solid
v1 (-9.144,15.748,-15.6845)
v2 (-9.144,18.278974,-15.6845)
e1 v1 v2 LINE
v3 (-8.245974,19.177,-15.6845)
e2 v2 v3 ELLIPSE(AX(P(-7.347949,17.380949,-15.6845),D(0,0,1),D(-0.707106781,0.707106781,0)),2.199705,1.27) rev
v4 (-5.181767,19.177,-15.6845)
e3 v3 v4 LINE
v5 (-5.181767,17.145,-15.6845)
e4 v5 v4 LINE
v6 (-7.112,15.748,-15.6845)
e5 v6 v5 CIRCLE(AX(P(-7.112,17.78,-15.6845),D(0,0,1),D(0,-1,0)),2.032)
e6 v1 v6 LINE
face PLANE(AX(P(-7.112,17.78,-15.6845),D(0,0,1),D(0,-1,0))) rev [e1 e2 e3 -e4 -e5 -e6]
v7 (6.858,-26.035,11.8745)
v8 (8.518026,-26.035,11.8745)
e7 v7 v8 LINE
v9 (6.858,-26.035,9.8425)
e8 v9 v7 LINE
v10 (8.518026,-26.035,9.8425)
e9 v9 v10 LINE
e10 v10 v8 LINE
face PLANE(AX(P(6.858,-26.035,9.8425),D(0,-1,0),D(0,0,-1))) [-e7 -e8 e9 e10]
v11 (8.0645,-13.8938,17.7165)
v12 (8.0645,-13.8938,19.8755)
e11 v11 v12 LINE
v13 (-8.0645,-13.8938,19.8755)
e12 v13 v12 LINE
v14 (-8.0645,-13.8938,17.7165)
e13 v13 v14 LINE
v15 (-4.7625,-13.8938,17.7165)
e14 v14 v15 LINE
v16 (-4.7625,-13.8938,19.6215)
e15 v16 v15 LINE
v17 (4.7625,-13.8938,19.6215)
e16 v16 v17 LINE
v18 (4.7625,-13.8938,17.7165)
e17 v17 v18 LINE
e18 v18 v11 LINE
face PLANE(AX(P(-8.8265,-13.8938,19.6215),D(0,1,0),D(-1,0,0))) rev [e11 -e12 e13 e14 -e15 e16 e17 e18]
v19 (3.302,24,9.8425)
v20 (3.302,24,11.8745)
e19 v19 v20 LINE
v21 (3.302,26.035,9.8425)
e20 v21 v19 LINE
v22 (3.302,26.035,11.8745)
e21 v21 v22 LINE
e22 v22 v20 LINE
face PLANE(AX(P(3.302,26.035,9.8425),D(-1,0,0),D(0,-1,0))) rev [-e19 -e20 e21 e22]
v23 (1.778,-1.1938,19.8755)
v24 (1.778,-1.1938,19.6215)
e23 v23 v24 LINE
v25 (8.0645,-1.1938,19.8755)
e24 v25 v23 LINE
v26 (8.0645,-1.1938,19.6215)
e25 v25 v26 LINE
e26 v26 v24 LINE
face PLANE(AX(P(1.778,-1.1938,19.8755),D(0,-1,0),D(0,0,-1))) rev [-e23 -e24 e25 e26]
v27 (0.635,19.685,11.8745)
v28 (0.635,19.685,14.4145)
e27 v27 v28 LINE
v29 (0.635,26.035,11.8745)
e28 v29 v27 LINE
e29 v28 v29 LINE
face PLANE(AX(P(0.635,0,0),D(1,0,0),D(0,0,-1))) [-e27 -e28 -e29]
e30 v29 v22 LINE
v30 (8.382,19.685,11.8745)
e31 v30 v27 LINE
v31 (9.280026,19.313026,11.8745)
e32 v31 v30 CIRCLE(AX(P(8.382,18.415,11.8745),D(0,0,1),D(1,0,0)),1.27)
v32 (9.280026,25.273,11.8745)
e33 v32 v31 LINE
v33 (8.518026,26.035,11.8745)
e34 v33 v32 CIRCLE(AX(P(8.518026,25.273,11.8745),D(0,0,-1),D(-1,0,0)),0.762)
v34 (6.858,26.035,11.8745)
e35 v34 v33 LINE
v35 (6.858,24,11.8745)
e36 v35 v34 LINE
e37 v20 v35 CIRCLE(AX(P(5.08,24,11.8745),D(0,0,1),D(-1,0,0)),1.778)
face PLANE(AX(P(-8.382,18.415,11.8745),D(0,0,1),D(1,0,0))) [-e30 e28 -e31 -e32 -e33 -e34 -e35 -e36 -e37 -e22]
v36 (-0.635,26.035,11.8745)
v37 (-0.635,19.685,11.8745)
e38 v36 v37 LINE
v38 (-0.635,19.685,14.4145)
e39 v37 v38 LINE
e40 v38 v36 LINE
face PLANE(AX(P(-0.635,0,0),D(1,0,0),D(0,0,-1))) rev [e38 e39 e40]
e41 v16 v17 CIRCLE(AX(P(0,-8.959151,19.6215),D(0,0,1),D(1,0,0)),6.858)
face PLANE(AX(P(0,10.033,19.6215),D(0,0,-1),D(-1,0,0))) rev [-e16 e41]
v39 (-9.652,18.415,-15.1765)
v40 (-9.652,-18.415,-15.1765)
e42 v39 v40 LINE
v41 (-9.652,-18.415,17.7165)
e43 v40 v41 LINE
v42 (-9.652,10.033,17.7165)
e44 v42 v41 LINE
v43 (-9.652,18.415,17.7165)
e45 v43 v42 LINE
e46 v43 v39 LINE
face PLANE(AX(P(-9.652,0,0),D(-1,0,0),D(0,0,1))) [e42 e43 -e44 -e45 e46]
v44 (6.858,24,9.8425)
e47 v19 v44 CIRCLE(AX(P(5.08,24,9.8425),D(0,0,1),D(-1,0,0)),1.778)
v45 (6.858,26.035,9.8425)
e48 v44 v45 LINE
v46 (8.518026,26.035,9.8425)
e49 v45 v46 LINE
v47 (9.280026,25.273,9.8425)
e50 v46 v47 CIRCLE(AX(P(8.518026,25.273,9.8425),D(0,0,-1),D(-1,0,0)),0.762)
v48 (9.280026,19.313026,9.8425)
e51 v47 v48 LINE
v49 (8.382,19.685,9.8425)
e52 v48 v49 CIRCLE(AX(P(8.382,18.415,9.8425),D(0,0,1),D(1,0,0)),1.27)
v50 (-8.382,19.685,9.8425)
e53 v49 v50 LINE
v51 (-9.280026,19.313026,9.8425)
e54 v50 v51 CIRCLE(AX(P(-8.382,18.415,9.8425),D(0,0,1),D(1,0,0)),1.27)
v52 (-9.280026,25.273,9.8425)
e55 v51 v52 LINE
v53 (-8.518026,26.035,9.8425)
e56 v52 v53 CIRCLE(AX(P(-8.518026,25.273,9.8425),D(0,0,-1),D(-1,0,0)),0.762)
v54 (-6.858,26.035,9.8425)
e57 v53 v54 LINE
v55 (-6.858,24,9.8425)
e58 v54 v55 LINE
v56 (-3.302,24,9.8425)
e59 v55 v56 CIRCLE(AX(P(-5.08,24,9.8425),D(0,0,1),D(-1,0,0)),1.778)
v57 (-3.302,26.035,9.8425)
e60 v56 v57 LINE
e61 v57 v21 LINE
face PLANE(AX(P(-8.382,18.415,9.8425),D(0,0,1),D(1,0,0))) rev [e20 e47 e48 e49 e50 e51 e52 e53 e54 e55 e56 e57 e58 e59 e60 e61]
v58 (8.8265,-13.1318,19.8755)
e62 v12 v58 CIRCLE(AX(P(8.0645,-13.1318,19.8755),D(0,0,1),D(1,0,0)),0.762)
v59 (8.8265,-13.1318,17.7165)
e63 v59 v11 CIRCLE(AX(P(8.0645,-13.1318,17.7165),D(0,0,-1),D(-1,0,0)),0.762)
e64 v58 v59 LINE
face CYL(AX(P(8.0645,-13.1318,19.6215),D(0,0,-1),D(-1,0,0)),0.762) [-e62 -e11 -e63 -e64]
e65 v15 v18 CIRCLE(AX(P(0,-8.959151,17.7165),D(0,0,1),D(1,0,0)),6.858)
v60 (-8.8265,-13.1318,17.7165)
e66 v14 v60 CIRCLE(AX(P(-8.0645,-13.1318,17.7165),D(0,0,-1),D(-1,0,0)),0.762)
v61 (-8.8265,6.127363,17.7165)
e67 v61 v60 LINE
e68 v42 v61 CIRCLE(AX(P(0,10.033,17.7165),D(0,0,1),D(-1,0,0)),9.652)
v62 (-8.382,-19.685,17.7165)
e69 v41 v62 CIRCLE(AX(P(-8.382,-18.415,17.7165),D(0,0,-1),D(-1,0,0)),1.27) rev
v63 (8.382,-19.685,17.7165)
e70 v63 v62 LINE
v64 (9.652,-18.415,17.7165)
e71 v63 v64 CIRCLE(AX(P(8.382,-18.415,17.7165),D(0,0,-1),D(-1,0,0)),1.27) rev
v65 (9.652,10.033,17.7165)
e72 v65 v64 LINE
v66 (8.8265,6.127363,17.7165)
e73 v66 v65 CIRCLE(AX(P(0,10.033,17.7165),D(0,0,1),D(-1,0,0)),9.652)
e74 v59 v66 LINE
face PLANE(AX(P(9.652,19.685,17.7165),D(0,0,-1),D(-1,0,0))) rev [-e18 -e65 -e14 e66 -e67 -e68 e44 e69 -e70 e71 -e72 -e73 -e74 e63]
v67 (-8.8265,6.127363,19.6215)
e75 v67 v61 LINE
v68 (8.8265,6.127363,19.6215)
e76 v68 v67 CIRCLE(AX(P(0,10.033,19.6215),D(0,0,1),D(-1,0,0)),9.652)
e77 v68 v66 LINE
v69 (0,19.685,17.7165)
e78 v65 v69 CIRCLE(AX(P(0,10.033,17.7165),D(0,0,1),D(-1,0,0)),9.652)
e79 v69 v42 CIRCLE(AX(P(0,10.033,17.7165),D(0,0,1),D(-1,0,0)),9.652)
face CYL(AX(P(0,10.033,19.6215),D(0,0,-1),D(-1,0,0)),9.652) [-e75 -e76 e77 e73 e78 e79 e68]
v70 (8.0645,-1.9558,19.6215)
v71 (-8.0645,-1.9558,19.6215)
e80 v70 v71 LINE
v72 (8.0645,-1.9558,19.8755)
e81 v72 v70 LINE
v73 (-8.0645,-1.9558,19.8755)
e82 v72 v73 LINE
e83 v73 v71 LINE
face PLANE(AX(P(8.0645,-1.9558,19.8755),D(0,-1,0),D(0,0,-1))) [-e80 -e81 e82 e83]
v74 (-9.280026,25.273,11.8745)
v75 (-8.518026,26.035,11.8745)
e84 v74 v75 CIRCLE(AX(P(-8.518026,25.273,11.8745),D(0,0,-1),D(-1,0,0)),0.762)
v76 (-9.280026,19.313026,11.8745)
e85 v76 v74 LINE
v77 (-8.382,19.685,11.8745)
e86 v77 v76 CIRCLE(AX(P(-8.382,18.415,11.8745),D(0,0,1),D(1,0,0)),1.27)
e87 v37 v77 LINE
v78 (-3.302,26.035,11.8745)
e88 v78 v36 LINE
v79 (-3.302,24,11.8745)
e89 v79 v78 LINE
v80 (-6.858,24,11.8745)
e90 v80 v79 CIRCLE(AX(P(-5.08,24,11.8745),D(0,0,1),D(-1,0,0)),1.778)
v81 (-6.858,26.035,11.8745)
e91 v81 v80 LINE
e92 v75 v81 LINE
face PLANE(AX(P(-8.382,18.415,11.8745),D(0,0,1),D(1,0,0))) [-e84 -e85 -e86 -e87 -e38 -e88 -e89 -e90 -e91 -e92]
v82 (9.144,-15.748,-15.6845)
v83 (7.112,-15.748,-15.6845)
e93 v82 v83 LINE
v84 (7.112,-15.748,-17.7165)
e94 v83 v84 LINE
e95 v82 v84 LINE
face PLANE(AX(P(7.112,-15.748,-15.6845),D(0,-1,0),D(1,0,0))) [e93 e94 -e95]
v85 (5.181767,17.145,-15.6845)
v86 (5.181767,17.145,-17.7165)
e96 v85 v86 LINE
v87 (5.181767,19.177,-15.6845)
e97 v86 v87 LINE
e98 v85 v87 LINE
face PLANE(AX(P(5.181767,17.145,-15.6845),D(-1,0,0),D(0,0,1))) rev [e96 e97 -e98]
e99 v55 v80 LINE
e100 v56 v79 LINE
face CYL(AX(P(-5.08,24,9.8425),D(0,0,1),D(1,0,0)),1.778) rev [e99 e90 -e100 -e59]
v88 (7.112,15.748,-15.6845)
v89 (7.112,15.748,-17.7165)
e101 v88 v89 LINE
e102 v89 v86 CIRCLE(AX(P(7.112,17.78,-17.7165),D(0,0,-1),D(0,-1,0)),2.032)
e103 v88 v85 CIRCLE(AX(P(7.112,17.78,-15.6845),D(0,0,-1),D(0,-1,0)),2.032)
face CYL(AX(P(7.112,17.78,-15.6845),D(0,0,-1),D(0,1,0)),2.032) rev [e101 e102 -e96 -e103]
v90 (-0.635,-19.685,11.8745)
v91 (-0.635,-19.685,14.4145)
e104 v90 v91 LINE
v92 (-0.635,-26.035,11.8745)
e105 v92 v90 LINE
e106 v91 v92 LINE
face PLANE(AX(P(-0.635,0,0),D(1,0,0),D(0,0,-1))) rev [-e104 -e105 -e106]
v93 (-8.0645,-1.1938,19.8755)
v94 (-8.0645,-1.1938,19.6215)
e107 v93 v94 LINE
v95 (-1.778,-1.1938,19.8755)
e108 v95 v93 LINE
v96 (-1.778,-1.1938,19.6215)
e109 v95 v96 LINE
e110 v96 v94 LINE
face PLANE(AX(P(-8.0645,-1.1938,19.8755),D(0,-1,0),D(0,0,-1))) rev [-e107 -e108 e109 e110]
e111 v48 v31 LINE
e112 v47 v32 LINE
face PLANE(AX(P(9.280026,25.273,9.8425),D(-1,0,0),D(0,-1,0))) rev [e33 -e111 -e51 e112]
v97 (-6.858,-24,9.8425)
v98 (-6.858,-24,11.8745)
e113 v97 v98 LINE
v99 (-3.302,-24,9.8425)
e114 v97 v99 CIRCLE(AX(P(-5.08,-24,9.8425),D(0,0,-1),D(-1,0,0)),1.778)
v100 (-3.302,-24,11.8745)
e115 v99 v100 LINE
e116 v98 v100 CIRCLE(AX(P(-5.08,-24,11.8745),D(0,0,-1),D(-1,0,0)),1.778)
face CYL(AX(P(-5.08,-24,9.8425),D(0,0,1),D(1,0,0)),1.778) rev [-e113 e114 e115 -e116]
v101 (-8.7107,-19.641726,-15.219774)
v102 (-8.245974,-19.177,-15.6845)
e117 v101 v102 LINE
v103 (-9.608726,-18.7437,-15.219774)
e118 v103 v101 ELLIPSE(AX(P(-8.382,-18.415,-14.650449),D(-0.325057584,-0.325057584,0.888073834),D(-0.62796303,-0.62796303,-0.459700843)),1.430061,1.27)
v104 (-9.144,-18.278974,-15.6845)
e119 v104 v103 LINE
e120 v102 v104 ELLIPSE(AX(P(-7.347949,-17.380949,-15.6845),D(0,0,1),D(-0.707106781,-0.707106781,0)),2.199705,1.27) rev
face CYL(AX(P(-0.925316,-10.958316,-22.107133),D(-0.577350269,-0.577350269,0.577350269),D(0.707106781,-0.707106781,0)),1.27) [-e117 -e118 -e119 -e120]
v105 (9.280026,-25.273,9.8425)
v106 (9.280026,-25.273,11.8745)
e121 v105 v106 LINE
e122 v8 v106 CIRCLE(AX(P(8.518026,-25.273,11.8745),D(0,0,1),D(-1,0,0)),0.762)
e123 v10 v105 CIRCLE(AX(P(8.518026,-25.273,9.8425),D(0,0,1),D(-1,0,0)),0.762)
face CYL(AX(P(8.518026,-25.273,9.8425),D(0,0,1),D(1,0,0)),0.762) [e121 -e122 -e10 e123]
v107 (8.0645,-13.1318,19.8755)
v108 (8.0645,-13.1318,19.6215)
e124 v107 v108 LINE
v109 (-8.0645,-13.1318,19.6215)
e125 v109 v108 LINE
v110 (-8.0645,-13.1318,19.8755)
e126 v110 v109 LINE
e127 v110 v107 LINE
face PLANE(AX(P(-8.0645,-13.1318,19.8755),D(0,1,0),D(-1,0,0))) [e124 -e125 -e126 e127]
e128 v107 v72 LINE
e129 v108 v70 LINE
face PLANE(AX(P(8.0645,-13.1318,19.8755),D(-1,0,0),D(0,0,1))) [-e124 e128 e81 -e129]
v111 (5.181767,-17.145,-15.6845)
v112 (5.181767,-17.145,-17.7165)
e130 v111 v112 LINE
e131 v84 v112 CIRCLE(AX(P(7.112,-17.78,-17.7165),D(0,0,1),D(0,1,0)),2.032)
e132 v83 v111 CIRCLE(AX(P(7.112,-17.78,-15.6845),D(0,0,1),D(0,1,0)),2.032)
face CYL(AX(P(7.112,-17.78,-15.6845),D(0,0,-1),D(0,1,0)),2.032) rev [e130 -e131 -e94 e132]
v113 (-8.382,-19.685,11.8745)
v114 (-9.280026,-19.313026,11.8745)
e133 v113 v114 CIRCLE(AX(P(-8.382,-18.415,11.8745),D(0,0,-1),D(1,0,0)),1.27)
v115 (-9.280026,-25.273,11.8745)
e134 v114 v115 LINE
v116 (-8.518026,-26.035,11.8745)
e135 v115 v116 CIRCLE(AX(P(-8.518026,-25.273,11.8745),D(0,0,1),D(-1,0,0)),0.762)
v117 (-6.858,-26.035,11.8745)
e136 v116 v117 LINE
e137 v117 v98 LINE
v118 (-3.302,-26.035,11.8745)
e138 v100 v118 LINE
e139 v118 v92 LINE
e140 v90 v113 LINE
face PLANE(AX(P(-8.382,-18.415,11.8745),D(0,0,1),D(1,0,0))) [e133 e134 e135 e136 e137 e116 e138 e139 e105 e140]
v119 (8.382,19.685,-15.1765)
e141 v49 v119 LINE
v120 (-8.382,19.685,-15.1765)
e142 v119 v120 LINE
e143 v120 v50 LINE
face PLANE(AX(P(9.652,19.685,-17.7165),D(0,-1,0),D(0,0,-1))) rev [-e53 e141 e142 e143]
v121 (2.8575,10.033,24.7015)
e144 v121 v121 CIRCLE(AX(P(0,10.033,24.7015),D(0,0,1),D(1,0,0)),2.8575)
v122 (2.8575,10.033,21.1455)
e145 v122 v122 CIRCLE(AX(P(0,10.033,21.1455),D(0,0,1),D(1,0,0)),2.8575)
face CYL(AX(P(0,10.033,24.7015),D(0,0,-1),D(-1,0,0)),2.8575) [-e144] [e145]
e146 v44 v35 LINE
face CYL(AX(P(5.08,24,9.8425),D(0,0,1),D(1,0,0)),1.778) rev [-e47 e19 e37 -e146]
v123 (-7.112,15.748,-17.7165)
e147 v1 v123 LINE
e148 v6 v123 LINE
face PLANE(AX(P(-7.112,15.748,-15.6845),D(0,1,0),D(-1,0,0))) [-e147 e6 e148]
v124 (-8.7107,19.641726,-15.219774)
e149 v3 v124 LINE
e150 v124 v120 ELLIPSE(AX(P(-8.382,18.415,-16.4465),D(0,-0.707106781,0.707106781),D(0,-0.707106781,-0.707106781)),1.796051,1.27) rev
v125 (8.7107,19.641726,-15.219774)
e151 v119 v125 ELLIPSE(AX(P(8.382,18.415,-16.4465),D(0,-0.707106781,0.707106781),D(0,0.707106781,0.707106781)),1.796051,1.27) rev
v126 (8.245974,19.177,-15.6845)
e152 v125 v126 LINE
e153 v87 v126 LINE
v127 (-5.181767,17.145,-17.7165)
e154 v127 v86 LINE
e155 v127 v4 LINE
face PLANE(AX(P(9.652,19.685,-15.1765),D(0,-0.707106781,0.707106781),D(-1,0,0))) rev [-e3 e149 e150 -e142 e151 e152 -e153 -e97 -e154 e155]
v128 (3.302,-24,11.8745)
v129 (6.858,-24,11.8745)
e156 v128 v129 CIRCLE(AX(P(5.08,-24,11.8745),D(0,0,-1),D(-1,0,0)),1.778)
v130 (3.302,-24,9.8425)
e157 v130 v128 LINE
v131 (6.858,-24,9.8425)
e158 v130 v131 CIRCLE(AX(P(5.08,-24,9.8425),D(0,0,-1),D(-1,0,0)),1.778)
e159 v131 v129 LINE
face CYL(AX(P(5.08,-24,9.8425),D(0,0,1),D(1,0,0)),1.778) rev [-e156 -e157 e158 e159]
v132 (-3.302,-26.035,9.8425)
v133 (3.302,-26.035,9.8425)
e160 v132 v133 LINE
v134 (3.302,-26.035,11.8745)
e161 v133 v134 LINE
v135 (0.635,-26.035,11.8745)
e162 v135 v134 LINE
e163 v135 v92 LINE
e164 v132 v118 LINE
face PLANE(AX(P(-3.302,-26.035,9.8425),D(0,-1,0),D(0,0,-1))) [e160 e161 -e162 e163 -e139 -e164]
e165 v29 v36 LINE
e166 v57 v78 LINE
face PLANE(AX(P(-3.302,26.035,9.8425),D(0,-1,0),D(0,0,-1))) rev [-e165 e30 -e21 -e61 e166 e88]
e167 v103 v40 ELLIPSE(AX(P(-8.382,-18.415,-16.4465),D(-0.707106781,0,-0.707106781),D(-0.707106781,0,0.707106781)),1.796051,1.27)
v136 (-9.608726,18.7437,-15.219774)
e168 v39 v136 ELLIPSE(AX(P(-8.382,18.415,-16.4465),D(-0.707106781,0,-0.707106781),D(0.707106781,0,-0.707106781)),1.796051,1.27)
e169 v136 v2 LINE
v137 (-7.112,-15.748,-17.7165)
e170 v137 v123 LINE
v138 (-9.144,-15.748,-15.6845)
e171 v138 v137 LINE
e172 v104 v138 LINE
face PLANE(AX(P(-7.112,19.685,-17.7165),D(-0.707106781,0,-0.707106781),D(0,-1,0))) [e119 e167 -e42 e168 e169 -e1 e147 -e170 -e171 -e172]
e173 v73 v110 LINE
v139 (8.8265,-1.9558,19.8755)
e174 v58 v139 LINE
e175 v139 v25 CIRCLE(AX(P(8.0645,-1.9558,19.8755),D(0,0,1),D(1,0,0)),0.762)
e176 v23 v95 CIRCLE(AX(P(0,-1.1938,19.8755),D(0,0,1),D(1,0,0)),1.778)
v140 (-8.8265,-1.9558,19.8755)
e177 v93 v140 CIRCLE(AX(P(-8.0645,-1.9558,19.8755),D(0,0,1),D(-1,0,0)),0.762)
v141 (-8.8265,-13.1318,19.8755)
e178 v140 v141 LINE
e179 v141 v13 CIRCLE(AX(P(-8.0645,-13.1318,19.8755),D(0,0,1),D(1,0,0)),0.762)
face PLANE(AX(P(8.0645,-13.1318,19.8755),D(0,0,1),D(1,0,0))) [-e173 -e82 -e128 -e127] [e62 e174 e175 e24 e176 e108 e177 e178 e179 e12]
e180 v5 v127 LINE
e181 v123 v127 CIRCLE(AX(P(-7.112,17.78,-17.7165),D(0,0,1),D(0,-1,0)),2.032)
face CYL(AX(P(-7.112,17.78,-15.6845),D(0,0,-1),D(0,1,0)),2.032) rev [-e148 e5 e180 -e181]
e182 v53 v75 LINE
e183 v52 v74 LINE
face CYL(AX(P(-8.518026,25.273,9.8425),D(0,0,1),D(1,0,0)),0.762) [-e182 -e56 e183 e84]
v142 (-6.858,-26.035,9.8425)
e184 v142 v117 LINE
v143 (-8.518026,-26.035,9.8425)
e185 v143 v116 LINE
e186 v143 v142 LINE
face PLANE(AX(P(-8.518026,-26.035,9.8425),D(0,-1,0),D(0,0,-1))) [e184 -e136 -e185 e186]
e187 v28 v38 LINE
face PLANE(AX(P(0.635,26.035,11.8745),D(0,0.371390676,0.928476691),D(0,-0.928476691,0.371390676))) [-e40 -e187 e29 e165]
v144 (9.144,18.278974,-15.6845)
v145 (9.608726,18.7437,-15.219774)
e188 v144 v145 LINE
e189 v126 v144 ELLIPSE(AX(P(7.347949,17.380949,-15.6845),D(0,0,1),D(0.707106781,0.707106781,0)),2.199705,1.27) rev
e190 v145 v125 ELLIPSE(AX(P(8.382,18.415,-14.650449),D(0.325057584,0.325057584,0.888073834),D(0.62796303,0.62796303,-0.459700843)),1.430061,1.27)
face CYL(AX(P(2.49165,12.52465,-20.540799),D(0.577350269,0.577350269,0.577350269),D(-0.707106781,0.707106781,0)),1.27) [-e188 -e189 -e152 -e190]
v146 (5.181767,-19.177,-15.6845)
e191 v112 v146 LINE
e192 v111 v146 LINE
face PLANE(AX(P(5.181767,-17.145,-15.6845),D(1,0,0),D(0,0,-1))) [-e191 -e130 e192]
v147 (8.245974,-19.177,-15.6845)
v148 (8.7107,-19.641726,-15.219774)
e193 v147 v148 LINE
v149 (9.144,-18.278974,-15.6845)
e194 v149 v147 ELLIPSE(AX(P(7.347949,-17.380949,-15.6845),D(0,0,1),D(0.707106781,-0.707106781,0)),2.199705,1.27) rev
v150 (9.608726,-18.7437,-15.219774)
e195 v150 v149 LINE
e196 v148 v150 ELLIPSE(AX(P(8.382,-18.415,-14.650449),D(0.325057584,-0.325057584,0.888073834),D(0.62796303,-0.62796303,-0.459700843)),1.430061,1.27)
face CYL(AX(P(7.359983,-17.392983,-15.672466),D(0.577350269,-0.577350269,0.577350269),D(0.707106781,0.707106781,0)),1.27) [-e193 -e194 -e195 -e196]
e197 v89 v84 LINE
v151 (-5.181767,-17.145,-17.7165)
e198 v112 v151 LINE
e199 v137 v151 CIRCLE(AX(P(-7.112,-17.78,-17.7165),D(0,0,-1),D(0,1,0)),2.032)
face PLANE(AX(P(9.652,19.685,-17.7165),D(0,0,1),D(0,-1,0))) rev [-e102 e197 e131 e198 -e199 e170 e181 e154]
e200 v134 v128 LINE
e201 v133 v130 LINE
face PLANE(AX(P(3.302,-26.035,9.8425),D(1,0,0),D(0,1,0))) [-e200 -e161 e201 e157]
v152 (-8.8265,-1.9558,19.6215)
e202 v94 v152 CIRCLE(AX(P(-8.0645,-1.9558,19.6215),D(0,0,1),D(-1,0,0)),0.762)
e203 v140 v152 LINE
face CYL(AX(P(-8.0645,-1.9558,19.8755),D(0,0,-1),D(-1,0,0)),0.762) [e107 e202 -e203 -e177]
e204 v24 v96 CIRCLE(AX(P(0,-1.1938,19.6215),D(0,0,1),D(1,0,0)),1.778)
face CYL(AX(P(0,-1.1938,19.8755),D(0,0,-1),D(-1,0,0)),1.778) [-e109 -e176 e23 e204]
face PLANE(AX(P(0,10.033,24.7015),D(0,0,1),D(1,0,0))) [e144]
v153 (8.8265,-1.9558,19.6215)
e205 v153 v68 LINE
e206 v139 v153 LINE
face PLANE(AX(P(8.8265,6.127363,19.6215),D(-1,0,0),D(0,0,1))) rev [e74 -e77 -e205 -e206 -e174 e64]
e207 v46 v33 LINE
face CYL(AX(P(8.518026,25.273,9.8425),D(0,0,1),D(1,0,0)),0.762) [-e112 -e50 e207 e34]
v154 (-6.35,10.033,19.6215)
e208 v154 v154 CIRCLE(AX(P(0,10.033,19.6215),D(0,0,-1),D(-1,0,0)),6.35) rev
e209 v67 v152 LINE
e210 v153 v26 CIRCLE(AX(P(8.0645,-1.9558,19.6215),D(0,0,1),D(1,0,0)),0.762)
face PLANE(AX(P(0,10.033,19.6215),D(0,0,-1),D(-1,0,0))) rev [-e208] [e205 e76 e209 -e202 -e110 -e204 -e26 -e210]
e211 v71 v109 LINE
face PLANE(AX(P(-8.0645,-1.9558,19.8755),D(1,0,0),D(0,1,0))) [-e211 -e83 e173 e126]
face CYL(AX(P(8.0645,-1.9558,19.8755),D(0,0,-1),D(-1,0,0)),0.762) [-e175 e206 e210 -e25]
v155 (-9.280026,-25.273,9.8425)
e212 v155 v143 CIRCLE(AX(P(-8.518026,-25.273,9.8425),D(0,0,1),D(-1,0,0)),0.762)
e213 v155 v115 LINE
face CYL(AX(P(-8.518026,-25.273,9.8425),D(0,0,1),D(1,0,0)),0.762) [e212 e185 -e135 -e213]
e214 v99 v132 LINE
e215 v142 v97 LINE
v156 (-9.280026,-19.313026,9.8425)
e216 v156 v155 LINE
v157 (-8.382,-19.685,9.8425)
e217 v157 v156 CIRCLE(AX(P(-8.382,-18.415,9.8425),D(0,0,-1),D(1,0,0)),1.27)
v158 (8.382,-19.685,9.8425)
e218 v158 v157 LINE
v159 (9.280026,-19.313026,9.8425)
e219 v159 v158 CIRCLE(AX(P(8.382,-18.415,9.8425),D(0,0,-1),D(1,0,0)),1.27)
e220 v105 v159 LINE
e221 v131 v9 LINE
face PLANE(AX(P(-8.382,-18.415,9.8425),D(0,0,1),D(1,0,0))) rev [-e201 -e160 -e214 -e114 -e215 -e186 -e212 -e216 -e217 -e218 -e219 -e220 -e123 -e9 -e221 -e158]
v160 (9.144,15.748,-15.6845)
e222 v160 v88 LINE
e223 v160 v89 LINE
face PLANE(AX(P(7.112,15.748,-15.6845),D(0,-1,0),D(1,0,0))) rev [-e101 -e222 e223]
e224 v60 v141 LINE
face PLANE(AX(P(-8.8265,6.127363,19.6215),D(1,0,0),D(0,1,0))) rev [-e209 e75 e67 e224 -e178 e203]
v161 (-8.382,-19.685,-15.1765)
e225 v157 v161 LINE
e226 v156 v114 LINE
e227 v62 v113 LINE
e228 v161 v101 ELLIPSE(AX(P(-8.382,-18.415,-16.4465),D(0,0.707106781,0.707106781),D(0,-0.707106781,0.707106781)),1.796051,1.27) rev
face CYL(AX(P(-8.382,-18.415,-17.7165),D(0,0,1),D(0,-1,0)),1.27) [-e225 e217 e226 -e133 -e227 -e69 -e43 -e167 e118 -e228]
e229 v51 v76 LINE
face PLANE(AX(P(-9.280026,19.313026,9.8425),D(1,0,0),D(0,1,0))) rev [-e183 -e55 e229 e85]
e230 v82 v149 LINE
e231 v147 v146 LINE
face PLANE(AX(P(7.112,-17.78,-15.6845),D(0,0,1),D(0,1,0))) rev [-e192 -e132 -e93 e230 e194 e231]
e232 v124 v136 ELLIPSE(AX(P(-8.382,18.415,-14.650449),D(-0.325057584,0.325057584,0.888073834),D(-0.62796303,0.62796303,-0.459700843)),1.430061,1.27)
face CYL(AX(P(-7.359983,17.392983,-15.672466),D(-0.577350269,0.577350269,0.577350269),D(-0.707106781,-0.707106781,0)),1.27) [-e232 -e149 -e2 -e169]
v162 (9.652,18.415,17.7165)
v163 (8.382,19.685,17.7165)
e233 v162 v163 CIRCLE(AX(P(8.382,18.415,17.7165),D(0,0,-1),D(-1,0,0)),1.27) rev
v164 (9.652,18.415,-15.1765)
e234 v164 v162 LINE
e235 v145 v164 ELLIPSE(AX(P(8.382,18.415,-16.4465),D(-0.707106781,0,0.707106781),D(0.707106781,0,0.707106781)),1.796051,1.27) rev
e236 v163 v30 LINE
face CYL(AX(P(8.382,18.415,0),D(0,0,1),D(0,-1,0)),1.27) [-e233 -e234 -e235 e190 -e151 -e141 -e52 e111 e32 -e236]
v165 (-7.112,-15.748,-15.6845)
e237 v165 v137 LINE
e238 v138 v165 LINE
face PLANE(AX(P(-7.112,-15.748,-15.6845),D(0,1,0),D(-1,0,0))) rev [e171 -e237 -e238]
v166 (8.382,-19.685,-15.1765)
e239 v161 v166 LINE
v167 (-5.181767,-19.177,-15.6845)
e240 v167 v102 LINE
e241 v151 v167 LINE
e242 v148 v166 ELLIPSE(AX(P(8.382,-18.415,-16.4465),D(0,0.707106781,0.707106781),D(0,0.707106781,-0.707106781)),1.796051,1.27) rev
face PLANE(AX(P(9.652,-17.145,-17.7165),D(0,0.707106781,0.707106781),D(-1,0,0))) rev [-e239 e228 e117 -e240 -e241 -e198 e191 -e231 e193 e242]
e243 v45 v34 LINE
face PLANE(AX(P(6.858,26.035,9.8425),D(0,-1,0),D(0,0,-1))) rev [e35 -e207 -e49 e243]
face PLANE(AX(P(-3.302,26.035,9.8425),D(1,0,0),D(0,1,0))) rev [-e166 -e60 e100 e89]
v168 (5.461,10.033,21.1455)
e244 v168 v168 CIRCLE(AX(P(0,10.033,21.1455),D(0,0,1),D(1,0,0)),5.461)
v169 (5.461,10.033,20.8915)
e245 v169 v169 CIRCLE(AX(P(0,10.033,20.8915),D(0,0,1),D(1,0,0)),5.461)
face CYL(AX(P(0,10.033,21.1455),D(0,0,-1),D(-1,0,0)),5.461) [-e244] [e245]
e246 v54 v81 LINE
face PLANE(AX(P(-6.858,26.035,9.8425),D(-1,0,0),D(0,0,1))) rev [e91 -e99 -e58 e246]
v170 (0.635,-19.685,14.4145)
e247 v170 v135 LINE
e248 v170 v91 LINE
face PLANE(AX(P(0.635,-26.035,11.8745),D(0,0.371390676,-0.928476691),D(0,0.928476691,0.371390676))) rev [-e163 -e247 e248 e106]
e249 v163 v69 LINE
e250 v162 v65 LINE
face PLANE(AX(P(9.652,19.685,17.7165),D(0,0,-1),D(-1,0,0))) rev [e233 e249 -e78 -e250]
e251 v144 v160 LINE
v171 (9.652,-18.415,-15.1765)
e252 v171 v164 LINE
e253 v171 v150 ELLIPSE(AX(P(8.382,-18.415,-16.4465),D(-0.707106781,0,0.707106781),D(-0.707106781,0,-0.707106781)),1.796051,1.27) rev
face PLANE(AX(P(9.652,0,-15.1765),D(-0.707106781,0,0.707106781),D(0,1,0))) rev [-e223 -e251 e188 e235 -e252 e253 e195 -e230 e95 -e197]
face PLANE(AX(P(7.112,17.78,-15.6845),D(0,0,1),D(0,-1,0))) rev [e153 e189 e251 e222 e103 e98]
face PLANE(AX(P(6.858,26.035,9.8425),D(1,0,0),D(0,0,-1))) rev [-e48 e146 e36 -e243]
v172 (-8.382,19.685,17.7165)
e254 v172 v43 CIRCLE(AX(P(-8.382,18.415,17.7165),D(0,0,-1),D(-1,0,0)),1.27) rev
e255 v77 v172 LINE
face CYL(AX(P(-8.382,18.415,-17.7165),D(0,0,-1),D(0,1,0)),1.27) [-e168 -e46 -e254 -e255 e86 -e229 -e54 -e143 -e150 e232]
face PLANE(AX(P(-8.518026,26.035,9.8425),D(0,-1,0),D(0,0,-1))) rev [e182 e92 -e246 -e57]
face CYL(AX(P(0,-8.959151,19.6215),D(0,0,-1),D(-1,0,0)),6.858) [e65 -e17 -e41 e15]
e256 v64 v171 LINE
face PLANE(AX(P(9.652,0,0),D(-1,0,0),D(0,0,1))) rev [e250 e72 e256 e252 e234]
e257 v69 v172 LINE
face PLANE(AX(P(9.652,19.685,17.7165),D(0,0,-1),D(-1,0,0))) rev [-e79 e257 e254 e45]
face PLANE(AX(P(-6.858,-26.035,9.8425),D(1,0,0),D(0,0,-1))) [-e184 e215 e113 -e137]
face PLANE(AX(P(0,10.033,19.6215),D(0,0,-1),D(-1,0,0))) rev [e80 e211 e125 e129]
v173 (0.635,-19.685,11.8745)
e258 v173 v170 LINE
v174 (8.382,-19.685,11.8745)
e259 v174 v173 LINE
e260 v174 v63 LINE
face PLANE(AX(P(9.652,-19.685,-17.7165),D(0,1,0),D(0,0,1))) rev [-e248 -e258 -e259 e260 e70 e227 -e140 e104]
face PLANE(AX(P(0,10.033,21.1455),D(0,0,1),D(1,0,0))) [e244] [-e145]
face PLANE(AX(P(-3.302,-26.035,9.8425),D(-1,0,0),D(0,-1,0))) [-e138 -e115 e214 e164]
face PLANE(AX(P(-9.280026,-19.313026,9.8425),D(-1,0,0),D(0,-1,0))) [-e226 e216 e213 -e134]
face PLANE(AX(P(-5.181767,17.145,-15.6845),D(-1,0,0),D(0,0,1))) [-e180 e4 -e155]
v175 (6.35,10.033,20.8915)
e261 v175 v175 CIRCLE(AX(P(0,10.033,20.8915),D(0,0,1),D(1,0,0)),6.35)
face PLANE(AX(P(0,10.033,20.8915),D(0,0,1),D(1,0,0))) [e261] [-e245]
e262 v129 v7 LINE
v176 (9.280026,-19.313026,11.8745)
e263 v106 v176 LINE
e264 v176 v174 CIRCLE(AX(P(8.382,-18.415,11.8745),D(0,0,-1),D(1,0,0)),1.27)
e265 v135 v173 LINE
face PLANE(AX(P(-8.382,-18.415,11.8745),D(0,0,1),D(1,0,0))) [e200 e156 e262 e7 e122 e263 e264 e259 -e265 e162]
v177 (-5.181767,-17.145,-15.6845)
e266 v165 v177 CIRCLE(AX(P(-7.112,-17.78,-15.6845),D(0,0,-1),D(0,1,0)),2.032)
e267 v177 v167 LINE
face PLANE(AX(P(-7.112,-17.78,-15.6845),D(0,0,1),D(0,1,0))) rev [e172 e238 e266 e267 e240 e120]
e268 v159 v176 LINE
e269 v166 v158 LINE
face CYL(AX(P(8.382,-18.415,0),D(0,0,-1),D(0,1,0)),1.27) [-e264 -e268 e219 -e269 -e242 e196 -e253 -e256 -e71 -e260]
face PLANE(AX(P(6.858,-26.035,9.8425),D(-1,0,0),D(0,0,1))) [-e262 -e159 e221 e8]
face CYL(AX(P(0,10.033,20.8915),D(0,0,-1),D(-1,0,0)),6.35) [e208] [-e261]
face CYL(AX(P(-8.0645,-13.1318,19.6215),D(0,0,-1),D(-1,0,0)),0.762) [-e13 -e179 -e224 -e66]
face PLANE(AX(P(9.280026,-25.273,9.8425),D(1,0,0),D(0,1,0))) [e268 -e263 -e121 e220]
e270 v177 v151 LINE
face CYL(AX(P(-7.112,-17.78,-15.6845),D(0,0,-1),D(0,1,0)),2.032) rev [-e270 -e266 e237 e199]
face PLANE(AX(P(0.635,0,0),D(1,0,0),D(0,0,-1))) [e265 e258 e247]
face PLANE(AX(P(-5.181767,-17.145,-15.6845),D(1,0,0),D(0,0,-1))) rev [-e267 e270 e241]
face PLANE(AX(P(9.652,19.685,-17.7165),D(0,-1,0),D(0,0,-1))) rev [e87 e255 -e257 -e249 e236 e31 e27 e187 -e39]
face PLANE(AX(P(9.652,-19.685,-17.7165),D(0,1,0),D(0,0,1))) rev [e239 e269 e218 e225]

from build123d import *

# Parameters (mm, degrees)
SKETCH1_W            = 35.433
SKETCH1_H            = 39.37
BOSS_EXTRUDE1_DEPTH  = 9.652
BOSS_EXTRUDE2_DEPTH  = 1.905
SKETCH3_R            = 6.35
BOSS_EXTRUDE3_DEPTH  = 1.27
SKETCH4_R            = 5.461
BOSS_EXTRUDE4_DEPTH  = 0.254
SKETCH6_R            = 2.8575
BOSS_EXTRUDE5_DEPTH  = 3.556
FILLET1_R            = 0.762
BOSS_EXTRUDE6_START  = 0.254
SKETCH7_W            = 16.129
SKETCH7_H            = 11.176
BOSS_EXTRUDE6_DEPTH  = 0.254
CHAMFER1_SIZE        = 2.54
FILLET3_R            = 1.27
FILLET4_R            = 1.27
CUT_EXTRUDE1_DEPTH   = 2.032
MIRROR2_COPY_1_DEPTH = 2.032
BOSS_EXTRUDE7_DEPTH  = 2.032
BOSS_EXTRUDE8_DEPTH  = 0.635


with BuildPart() as part:
    # Sketch1 → Boss-Extrude1 (new, symmetric)
    with BuildSketch(Plane(origin=(0, 0, 0), x_dir=(0, 0, -1), z_dir=(1, 0, 0))):
        Rectangle(SKETCH1_W, SKETCH1_H)
    extrude(amount=BOSS_EXTRUDE1_DEPTH, both=True)

    # Sketch2 → Boss-Extrude2 (add)
    with BuildSketch(Plane.XY.offset(17.7165)):
        with BuildLine():
            Line((-8.8265, 6.127362824), (-8.8265, -13.8938))
            Line((-8.8265, -13.8938), (-4.7625, -13.8938))
            ThreePointArc((-4.7625, -13.8938), (0, -15.817151304), (4.7625, -13.8938))
            Line((4.7625, -13.8938), (8.8265, -13.8938))
            Line((8.8265, -13.8938), (8.8265, 6.127362824))
            ThreePointArc((8.8265, 6.127362824), (0, 19.685), (-8.8265, 6.127362824))
        make_face()
    extrude(amount=BOSS_EXTRUDE2_DEPTH)

    # Sketch3 → Boss-Extrude3 (add)
    with BuildSketch(Plane.XY.offset(19.6215)):
        with Locations(Location((0, 10.033, 0), (0, 0, 180))):
            Circle(SKETCH3_R)
    extrude(amount=BOSS_EXTRUDE3_DEPTH)

    # Sketch4 → Boss-Extrude4 (add)
    with BuildSketch(Plane.XY.offset(20.8915)):
        with Locations((0, 10.033)):
            Circle(SKETCH4_R)
    extrude(amount=BOSS_EXTRUDE4_DEPTH)

    # Sketch6 → Boss-Extrude5 (add)
    with BuildSketch(Plane.XY.offset(21.1455)):
        with Locations((0, 10.033)):
            Circle(SKETCH6_R)
    extrude(amount=BOSS_EXTRUDE5_DEPTH)

    # Fillet1
    fillet1_edges = [part.edges().sort_by_distance(p)[0] for p in [
        (-8.8265, -13.8938, 18.669),
        (8.8265, -13.8938, 18.669),
    ]]
    fillet(fillet1_edges, radius=FILLET1_R)

    # Sketch7 → Boss-Extrude6 (add)
    with BuildSketch(Plane.XY.offset(19.6215).offset(BOSS_EXTRUDE6_START)):
        with BuildLine():
            Line((8.8265, -13.1318), (8.8265, -1.9558))
            ThreePointArc((8.8265, -1.9558), (8.603315367, -1.416984633), (8.0645, -1.1938))
            Line((8.0645, -1.1938), (1.778, -1.1938))
            ThreePointArc((1.778, -1.1938), (0, 0.5842), (-1.778, -1.1938))
            Line((-1.778, -1.1938), (-8.0645, -1.1938))
            ThreePointArc((-8.0645, -1.1938), (-8.603315367, -1.416984633), (-8.8265, -1.9558))
            Line((-8.8265, -1.9558), (-8.8265, -13.1318))
            ThreePointArc((-8.8265, -13.1318), (-8.603315367, -13.670615367), (-8.0645, -13.8938))
            Line((-8.0645, -13.8938), (8.0645, -13.8938))
            ThreePointArc((8.0645, -13.8938), (8.603315367, -13.670615367), (8.8265, -13.1318))
        make_face()
        with Locations((0, -7.5438)):
            Rectangle(SKETCH7_W, SKETCH7_H, mode=Mode.SUBTRACT)
    extrude(amount=-BOSS_EXTRUDE6_DEPTH)

    # Chamfer1
    chamfer1_edges = [part.edges().sort_by_distance(p)[0] for p in [
        (9.652, 0, -17.7165),
        (-9.652, 0, -17.7165),
        (0, 19.685, -17.7165),
        (0, -19.685, -17.7165),
    ]]
    chamfer(chamfer1_edges, length=CHAMFER1_SIZE)

    # Fillet3
    # the kernel refuses this fillet: 1.27 mm, written as the material it takes off along each edge
    with BuildSketch(Plane(origin=(9.652, 19.685, -18.3515), x_dir=(0, -1, 0), z_dir=(0, 0, 1))) as fillet3_piece_1:
        with BuildLine():
            CenterArc((FILLET3_R, -FILLET3_R), FILLET3_R, 90, 90)
            Line((0, -FILLET3_R), (0, 0))
            Line((0, 0), (FILLET3_R, 0))
        make_face()
    extrude(amount=39.243, mode=Mode.SUBTRACT)
    with BuildSketch(Plane(origin=(10.710333333, 20.743333333, -14.118166667), x_dir=(0.408248290463863, -0.816496580927726, 0.408248290463863), z_dir=(-0.5773502691896258, -0.5773502691896257, -0.5773502691896257))) as fillet3_piece_2:
        with BuildLine():
            CenterArc((FILLET3_R * 0.57735026919, FILLET3_R), FILLET3_R, 210, 60)
            Line((-FILLET3_R * 0.288675134595, FILLET3_R * 0.5), (0, 0))
            Line((0, 0), (FILLET3_R * 0.57735026919, 0))
        make_face()
    extrude(amount=8.065583261, mode=Mode.SUBTRACT)

    # Fillet4
    # the kernel refuses this fillet: 1.27 mm, written as the material it takes off along each edge
    with BuildSketch(Plane(origin=(-9.652, 19.685, -18.3515), x_dir=(0, -1, 0), z_dir=(0, 0, 1))) as fillet4_piece_1:
        with BuildLine():
            CenterArc((FILLET4_R, FILLET4_R), FILLET4_R, 180, 90)
            Line((0, FILLET4_R), (0, 0))
            Line((0, 0), (FILLET4_R, 0))
        make_face()
    extrude(amount=39.243, mode=Mode.SUBTRACT)
    with BuildSketch(Plane(origin=(-6.053666667, 16.086666667, -18.774833333), x_dir=(0.816496580927726, 0.40824829046386296, 0.40824829046386296), z_dir=(-0.5773502691896257, 0.5773502691896258, 0.5773502691896258)), Plane(origin=(10.710333333, -20.743333333, -14.118166667), x_dir=(0.4082482904638618, 0.816496580927726, 0.40824829046386424), z_dir=(-0.5773502691896258, 0.5773502691896257, -0.5773502691896257))) as fillet4_piece_2:
        with BuildLine():
            CenterArc((FILLET4_R * 0.57735026919, -FILLET4_R), FILLET4_R, 90, 60)
            Line((-FILLET4_R * 0.288675134595, -FILLET4_R * 0.5), (0, 0))
            Line((0, 0), (FILLET4_R * 0.57735026919, 0))
        make_face()
    extrude(amount=8.065583261, mode=Mode.SUBTRACT)
    with BuildSketch(Plane(origin=(-6.053666667, -16.086666667, -18.774833333), x_dir=(0.8164965809277258, -0.4082482904638633, 0.4082482904638633), z_dir=(-0.5773502691896261, -0.5773502691896256, 0.5773502691896256))) as fillet4_piece_3:
        with BuildLine():
            CenterArc((FILLET4_R * 0.57735026919, FILLET4_R), FILLET4_R, 210, 60)
            Line((-FILLET4_R * 0.288675134595, FILLET4_R * 0.5), (0, 0))
            Line((0, 0), (FILLET4_R * 0.57735026919, 0))
        make_face()
    extrude(amount=8.065583261, mode=Mode.SUBTRACT)
    with BuildSketch(Plane(origin=(-9.652, -19.685, 20.8915), x_dir=(1, 0, 0), z_dir=(0, 0, -1)), Plane(origin=(9.652, -19.685, 20.8915), x_dir=(0, 1, 0), z_dir=(0, 0, -1))) as fillet4_piece_4:
        with BuildLine():
            CenterArc((FILLET4_R, -FILLET4_R), FILLET4_R, 90, 90)
            Line((0, -FILLET4_R), (0, 0))
            Line((0, 0), (FILLET4_R, 0))
        make_face()
    extrude(amount=39.243, mode=Mode.SUBTRACT)

    # Sketch9 → Cut-Extrude1 (cut)
    with BuildSketch(Plane(origin=(0, 0, -17.7165), x_dir=(-1, 0, 0), z_dir=(0, 0, -1))):
        with BuildLine():
            Line((-5.181767112, 17.145), (-5.181767112, 19.685))
            Line((-5.181767112, 19.685), (-9.652, 19.685))
            Line((-9.652, 19.685), (-9.652, 15.748))
            Line((-9.652, 15.748), (-7.112, 15.748))
            ThreePointArc((-7.112, 15.748), (-5.920634397, 16.133891863), (-5.181767112, 17.145))
        make_face()
    cut_extrude1 = extrude(amount=-CUT_EXTRUDE1_DEPTH, mode=Mode.SUBTRACT)

    # Mirror1: Cut-Extrude1 across plane
    add(cut_extrude1.mirror(Plane.ZX), mode=Mode.SUBTRACT)

    # Mirror2: Cut-Extrude1 across plane
    add(cut_extrude1.mirror(Plane(origin=(0, 0, 0), x_dir=(0, 0, 1), z_dir=(1, 0, 0))), mode=Mode.SUBTRACT)

    # Mirror2 copy 1 sketch → Mirror2 copy 1 (cut)
    with BuildSketch(Plane(origin=(0, 0, -17.7165), x_dir=(1, 0, 0), z_dir=(0, 0, -1))):
        with BuildLine():
            Line((-5.181767112, 17.145), (-5.181767112, 19.685))
            Line((-5.181767112, 19.685), (-9.652, 19.685))
            Line((-9.652, 19.685), (-9.652, 15.748))
            Line((-9.652, 15.748), (-7.112, 15.748))
            ThreePointArc((-7.112, 15.748), (-5.920634397, 16.133891863), (-5.181767112, 17.145))
        make_face()
    extrude(amount=-MIRROR2_COPY_1_DEPTH, mode=Mode.SUBTRACT)

    # Sketch13 → Boss-Extrude7 (add)
    with BuildSketch(Plane.XY.offset(11.8745)):
        with BuildLine():
            Line((-9.280025612, -19.313025612), (-9.280025612, -25.273))
            ThreePointArc((-9.280025612, -25.273), (-9.056840979, -25.811815367), (-8.518025612, -26.035))
            Line((-8.518025612, -26.035), (-6.858, -26.035))
            Line((-6.858, -26.035), (-6.858, -24))
            ThreePointArc((-6.858, -24), (-5.08, -22.222), (-3.302, -24))
            Line((-3.302, -24), (-3.302, -26.035))
            Line((-3.302, -26.035), (3.302, -26.035))
            Line((3.302, -26.035), (3.302, -24))
            ThreePointArc((3.302, -24), (5.08, -22.222), (6.858, -24))
            Line((6.858, -24), (6.858, -26.035))
            Line((6.858, -26.035), (8.518025612, -26.035))
            ThreePointArc((8.518025612, -26.035), (9.056840979, -25.811815367), (9.280025612, -25.273))
            Line((9.280025612, -25.273), (9.280025612, -19.313025612))
            ThreePointArc((9.280025612, -19.313025612), (8.868007959, -19.588327006), (8.382, -19.685))
            Line((8.382, -19.685), (-8.382, -19.685))
            ThreePointArc((-8.382, -19.685), (-8.868007959, -19.588327006), (-9.280025612, -19.313025612))
        make_face()
    boss_extrude7 = extrude(amount=-BOSS_EXTRUDE7_DEPTH)

    # Sketch14 → Boss-Extrude8 (add, symmetric)
    with BuildSketch(Plane(origin=(0, 0, 0), x_dir=(0, 0, -1), z_dir=(1, 0, 0))):
        Polygon((-11.8745, -26.035), (-14.4145, -19.685), (-11.8745, -19.685), align=None)
    boss_extrude8 = extrude(amount=BOSS_EXTRUDE8_DEPTH, both=True)

    # Mirror3: Boss-Extrude7, Boss-Extrude8 across plane
    add(boss_extrude7.mirror(Plane.ZX))
    add(boss_extrude8.mirror(Plane.ZX))


solid = part.part
